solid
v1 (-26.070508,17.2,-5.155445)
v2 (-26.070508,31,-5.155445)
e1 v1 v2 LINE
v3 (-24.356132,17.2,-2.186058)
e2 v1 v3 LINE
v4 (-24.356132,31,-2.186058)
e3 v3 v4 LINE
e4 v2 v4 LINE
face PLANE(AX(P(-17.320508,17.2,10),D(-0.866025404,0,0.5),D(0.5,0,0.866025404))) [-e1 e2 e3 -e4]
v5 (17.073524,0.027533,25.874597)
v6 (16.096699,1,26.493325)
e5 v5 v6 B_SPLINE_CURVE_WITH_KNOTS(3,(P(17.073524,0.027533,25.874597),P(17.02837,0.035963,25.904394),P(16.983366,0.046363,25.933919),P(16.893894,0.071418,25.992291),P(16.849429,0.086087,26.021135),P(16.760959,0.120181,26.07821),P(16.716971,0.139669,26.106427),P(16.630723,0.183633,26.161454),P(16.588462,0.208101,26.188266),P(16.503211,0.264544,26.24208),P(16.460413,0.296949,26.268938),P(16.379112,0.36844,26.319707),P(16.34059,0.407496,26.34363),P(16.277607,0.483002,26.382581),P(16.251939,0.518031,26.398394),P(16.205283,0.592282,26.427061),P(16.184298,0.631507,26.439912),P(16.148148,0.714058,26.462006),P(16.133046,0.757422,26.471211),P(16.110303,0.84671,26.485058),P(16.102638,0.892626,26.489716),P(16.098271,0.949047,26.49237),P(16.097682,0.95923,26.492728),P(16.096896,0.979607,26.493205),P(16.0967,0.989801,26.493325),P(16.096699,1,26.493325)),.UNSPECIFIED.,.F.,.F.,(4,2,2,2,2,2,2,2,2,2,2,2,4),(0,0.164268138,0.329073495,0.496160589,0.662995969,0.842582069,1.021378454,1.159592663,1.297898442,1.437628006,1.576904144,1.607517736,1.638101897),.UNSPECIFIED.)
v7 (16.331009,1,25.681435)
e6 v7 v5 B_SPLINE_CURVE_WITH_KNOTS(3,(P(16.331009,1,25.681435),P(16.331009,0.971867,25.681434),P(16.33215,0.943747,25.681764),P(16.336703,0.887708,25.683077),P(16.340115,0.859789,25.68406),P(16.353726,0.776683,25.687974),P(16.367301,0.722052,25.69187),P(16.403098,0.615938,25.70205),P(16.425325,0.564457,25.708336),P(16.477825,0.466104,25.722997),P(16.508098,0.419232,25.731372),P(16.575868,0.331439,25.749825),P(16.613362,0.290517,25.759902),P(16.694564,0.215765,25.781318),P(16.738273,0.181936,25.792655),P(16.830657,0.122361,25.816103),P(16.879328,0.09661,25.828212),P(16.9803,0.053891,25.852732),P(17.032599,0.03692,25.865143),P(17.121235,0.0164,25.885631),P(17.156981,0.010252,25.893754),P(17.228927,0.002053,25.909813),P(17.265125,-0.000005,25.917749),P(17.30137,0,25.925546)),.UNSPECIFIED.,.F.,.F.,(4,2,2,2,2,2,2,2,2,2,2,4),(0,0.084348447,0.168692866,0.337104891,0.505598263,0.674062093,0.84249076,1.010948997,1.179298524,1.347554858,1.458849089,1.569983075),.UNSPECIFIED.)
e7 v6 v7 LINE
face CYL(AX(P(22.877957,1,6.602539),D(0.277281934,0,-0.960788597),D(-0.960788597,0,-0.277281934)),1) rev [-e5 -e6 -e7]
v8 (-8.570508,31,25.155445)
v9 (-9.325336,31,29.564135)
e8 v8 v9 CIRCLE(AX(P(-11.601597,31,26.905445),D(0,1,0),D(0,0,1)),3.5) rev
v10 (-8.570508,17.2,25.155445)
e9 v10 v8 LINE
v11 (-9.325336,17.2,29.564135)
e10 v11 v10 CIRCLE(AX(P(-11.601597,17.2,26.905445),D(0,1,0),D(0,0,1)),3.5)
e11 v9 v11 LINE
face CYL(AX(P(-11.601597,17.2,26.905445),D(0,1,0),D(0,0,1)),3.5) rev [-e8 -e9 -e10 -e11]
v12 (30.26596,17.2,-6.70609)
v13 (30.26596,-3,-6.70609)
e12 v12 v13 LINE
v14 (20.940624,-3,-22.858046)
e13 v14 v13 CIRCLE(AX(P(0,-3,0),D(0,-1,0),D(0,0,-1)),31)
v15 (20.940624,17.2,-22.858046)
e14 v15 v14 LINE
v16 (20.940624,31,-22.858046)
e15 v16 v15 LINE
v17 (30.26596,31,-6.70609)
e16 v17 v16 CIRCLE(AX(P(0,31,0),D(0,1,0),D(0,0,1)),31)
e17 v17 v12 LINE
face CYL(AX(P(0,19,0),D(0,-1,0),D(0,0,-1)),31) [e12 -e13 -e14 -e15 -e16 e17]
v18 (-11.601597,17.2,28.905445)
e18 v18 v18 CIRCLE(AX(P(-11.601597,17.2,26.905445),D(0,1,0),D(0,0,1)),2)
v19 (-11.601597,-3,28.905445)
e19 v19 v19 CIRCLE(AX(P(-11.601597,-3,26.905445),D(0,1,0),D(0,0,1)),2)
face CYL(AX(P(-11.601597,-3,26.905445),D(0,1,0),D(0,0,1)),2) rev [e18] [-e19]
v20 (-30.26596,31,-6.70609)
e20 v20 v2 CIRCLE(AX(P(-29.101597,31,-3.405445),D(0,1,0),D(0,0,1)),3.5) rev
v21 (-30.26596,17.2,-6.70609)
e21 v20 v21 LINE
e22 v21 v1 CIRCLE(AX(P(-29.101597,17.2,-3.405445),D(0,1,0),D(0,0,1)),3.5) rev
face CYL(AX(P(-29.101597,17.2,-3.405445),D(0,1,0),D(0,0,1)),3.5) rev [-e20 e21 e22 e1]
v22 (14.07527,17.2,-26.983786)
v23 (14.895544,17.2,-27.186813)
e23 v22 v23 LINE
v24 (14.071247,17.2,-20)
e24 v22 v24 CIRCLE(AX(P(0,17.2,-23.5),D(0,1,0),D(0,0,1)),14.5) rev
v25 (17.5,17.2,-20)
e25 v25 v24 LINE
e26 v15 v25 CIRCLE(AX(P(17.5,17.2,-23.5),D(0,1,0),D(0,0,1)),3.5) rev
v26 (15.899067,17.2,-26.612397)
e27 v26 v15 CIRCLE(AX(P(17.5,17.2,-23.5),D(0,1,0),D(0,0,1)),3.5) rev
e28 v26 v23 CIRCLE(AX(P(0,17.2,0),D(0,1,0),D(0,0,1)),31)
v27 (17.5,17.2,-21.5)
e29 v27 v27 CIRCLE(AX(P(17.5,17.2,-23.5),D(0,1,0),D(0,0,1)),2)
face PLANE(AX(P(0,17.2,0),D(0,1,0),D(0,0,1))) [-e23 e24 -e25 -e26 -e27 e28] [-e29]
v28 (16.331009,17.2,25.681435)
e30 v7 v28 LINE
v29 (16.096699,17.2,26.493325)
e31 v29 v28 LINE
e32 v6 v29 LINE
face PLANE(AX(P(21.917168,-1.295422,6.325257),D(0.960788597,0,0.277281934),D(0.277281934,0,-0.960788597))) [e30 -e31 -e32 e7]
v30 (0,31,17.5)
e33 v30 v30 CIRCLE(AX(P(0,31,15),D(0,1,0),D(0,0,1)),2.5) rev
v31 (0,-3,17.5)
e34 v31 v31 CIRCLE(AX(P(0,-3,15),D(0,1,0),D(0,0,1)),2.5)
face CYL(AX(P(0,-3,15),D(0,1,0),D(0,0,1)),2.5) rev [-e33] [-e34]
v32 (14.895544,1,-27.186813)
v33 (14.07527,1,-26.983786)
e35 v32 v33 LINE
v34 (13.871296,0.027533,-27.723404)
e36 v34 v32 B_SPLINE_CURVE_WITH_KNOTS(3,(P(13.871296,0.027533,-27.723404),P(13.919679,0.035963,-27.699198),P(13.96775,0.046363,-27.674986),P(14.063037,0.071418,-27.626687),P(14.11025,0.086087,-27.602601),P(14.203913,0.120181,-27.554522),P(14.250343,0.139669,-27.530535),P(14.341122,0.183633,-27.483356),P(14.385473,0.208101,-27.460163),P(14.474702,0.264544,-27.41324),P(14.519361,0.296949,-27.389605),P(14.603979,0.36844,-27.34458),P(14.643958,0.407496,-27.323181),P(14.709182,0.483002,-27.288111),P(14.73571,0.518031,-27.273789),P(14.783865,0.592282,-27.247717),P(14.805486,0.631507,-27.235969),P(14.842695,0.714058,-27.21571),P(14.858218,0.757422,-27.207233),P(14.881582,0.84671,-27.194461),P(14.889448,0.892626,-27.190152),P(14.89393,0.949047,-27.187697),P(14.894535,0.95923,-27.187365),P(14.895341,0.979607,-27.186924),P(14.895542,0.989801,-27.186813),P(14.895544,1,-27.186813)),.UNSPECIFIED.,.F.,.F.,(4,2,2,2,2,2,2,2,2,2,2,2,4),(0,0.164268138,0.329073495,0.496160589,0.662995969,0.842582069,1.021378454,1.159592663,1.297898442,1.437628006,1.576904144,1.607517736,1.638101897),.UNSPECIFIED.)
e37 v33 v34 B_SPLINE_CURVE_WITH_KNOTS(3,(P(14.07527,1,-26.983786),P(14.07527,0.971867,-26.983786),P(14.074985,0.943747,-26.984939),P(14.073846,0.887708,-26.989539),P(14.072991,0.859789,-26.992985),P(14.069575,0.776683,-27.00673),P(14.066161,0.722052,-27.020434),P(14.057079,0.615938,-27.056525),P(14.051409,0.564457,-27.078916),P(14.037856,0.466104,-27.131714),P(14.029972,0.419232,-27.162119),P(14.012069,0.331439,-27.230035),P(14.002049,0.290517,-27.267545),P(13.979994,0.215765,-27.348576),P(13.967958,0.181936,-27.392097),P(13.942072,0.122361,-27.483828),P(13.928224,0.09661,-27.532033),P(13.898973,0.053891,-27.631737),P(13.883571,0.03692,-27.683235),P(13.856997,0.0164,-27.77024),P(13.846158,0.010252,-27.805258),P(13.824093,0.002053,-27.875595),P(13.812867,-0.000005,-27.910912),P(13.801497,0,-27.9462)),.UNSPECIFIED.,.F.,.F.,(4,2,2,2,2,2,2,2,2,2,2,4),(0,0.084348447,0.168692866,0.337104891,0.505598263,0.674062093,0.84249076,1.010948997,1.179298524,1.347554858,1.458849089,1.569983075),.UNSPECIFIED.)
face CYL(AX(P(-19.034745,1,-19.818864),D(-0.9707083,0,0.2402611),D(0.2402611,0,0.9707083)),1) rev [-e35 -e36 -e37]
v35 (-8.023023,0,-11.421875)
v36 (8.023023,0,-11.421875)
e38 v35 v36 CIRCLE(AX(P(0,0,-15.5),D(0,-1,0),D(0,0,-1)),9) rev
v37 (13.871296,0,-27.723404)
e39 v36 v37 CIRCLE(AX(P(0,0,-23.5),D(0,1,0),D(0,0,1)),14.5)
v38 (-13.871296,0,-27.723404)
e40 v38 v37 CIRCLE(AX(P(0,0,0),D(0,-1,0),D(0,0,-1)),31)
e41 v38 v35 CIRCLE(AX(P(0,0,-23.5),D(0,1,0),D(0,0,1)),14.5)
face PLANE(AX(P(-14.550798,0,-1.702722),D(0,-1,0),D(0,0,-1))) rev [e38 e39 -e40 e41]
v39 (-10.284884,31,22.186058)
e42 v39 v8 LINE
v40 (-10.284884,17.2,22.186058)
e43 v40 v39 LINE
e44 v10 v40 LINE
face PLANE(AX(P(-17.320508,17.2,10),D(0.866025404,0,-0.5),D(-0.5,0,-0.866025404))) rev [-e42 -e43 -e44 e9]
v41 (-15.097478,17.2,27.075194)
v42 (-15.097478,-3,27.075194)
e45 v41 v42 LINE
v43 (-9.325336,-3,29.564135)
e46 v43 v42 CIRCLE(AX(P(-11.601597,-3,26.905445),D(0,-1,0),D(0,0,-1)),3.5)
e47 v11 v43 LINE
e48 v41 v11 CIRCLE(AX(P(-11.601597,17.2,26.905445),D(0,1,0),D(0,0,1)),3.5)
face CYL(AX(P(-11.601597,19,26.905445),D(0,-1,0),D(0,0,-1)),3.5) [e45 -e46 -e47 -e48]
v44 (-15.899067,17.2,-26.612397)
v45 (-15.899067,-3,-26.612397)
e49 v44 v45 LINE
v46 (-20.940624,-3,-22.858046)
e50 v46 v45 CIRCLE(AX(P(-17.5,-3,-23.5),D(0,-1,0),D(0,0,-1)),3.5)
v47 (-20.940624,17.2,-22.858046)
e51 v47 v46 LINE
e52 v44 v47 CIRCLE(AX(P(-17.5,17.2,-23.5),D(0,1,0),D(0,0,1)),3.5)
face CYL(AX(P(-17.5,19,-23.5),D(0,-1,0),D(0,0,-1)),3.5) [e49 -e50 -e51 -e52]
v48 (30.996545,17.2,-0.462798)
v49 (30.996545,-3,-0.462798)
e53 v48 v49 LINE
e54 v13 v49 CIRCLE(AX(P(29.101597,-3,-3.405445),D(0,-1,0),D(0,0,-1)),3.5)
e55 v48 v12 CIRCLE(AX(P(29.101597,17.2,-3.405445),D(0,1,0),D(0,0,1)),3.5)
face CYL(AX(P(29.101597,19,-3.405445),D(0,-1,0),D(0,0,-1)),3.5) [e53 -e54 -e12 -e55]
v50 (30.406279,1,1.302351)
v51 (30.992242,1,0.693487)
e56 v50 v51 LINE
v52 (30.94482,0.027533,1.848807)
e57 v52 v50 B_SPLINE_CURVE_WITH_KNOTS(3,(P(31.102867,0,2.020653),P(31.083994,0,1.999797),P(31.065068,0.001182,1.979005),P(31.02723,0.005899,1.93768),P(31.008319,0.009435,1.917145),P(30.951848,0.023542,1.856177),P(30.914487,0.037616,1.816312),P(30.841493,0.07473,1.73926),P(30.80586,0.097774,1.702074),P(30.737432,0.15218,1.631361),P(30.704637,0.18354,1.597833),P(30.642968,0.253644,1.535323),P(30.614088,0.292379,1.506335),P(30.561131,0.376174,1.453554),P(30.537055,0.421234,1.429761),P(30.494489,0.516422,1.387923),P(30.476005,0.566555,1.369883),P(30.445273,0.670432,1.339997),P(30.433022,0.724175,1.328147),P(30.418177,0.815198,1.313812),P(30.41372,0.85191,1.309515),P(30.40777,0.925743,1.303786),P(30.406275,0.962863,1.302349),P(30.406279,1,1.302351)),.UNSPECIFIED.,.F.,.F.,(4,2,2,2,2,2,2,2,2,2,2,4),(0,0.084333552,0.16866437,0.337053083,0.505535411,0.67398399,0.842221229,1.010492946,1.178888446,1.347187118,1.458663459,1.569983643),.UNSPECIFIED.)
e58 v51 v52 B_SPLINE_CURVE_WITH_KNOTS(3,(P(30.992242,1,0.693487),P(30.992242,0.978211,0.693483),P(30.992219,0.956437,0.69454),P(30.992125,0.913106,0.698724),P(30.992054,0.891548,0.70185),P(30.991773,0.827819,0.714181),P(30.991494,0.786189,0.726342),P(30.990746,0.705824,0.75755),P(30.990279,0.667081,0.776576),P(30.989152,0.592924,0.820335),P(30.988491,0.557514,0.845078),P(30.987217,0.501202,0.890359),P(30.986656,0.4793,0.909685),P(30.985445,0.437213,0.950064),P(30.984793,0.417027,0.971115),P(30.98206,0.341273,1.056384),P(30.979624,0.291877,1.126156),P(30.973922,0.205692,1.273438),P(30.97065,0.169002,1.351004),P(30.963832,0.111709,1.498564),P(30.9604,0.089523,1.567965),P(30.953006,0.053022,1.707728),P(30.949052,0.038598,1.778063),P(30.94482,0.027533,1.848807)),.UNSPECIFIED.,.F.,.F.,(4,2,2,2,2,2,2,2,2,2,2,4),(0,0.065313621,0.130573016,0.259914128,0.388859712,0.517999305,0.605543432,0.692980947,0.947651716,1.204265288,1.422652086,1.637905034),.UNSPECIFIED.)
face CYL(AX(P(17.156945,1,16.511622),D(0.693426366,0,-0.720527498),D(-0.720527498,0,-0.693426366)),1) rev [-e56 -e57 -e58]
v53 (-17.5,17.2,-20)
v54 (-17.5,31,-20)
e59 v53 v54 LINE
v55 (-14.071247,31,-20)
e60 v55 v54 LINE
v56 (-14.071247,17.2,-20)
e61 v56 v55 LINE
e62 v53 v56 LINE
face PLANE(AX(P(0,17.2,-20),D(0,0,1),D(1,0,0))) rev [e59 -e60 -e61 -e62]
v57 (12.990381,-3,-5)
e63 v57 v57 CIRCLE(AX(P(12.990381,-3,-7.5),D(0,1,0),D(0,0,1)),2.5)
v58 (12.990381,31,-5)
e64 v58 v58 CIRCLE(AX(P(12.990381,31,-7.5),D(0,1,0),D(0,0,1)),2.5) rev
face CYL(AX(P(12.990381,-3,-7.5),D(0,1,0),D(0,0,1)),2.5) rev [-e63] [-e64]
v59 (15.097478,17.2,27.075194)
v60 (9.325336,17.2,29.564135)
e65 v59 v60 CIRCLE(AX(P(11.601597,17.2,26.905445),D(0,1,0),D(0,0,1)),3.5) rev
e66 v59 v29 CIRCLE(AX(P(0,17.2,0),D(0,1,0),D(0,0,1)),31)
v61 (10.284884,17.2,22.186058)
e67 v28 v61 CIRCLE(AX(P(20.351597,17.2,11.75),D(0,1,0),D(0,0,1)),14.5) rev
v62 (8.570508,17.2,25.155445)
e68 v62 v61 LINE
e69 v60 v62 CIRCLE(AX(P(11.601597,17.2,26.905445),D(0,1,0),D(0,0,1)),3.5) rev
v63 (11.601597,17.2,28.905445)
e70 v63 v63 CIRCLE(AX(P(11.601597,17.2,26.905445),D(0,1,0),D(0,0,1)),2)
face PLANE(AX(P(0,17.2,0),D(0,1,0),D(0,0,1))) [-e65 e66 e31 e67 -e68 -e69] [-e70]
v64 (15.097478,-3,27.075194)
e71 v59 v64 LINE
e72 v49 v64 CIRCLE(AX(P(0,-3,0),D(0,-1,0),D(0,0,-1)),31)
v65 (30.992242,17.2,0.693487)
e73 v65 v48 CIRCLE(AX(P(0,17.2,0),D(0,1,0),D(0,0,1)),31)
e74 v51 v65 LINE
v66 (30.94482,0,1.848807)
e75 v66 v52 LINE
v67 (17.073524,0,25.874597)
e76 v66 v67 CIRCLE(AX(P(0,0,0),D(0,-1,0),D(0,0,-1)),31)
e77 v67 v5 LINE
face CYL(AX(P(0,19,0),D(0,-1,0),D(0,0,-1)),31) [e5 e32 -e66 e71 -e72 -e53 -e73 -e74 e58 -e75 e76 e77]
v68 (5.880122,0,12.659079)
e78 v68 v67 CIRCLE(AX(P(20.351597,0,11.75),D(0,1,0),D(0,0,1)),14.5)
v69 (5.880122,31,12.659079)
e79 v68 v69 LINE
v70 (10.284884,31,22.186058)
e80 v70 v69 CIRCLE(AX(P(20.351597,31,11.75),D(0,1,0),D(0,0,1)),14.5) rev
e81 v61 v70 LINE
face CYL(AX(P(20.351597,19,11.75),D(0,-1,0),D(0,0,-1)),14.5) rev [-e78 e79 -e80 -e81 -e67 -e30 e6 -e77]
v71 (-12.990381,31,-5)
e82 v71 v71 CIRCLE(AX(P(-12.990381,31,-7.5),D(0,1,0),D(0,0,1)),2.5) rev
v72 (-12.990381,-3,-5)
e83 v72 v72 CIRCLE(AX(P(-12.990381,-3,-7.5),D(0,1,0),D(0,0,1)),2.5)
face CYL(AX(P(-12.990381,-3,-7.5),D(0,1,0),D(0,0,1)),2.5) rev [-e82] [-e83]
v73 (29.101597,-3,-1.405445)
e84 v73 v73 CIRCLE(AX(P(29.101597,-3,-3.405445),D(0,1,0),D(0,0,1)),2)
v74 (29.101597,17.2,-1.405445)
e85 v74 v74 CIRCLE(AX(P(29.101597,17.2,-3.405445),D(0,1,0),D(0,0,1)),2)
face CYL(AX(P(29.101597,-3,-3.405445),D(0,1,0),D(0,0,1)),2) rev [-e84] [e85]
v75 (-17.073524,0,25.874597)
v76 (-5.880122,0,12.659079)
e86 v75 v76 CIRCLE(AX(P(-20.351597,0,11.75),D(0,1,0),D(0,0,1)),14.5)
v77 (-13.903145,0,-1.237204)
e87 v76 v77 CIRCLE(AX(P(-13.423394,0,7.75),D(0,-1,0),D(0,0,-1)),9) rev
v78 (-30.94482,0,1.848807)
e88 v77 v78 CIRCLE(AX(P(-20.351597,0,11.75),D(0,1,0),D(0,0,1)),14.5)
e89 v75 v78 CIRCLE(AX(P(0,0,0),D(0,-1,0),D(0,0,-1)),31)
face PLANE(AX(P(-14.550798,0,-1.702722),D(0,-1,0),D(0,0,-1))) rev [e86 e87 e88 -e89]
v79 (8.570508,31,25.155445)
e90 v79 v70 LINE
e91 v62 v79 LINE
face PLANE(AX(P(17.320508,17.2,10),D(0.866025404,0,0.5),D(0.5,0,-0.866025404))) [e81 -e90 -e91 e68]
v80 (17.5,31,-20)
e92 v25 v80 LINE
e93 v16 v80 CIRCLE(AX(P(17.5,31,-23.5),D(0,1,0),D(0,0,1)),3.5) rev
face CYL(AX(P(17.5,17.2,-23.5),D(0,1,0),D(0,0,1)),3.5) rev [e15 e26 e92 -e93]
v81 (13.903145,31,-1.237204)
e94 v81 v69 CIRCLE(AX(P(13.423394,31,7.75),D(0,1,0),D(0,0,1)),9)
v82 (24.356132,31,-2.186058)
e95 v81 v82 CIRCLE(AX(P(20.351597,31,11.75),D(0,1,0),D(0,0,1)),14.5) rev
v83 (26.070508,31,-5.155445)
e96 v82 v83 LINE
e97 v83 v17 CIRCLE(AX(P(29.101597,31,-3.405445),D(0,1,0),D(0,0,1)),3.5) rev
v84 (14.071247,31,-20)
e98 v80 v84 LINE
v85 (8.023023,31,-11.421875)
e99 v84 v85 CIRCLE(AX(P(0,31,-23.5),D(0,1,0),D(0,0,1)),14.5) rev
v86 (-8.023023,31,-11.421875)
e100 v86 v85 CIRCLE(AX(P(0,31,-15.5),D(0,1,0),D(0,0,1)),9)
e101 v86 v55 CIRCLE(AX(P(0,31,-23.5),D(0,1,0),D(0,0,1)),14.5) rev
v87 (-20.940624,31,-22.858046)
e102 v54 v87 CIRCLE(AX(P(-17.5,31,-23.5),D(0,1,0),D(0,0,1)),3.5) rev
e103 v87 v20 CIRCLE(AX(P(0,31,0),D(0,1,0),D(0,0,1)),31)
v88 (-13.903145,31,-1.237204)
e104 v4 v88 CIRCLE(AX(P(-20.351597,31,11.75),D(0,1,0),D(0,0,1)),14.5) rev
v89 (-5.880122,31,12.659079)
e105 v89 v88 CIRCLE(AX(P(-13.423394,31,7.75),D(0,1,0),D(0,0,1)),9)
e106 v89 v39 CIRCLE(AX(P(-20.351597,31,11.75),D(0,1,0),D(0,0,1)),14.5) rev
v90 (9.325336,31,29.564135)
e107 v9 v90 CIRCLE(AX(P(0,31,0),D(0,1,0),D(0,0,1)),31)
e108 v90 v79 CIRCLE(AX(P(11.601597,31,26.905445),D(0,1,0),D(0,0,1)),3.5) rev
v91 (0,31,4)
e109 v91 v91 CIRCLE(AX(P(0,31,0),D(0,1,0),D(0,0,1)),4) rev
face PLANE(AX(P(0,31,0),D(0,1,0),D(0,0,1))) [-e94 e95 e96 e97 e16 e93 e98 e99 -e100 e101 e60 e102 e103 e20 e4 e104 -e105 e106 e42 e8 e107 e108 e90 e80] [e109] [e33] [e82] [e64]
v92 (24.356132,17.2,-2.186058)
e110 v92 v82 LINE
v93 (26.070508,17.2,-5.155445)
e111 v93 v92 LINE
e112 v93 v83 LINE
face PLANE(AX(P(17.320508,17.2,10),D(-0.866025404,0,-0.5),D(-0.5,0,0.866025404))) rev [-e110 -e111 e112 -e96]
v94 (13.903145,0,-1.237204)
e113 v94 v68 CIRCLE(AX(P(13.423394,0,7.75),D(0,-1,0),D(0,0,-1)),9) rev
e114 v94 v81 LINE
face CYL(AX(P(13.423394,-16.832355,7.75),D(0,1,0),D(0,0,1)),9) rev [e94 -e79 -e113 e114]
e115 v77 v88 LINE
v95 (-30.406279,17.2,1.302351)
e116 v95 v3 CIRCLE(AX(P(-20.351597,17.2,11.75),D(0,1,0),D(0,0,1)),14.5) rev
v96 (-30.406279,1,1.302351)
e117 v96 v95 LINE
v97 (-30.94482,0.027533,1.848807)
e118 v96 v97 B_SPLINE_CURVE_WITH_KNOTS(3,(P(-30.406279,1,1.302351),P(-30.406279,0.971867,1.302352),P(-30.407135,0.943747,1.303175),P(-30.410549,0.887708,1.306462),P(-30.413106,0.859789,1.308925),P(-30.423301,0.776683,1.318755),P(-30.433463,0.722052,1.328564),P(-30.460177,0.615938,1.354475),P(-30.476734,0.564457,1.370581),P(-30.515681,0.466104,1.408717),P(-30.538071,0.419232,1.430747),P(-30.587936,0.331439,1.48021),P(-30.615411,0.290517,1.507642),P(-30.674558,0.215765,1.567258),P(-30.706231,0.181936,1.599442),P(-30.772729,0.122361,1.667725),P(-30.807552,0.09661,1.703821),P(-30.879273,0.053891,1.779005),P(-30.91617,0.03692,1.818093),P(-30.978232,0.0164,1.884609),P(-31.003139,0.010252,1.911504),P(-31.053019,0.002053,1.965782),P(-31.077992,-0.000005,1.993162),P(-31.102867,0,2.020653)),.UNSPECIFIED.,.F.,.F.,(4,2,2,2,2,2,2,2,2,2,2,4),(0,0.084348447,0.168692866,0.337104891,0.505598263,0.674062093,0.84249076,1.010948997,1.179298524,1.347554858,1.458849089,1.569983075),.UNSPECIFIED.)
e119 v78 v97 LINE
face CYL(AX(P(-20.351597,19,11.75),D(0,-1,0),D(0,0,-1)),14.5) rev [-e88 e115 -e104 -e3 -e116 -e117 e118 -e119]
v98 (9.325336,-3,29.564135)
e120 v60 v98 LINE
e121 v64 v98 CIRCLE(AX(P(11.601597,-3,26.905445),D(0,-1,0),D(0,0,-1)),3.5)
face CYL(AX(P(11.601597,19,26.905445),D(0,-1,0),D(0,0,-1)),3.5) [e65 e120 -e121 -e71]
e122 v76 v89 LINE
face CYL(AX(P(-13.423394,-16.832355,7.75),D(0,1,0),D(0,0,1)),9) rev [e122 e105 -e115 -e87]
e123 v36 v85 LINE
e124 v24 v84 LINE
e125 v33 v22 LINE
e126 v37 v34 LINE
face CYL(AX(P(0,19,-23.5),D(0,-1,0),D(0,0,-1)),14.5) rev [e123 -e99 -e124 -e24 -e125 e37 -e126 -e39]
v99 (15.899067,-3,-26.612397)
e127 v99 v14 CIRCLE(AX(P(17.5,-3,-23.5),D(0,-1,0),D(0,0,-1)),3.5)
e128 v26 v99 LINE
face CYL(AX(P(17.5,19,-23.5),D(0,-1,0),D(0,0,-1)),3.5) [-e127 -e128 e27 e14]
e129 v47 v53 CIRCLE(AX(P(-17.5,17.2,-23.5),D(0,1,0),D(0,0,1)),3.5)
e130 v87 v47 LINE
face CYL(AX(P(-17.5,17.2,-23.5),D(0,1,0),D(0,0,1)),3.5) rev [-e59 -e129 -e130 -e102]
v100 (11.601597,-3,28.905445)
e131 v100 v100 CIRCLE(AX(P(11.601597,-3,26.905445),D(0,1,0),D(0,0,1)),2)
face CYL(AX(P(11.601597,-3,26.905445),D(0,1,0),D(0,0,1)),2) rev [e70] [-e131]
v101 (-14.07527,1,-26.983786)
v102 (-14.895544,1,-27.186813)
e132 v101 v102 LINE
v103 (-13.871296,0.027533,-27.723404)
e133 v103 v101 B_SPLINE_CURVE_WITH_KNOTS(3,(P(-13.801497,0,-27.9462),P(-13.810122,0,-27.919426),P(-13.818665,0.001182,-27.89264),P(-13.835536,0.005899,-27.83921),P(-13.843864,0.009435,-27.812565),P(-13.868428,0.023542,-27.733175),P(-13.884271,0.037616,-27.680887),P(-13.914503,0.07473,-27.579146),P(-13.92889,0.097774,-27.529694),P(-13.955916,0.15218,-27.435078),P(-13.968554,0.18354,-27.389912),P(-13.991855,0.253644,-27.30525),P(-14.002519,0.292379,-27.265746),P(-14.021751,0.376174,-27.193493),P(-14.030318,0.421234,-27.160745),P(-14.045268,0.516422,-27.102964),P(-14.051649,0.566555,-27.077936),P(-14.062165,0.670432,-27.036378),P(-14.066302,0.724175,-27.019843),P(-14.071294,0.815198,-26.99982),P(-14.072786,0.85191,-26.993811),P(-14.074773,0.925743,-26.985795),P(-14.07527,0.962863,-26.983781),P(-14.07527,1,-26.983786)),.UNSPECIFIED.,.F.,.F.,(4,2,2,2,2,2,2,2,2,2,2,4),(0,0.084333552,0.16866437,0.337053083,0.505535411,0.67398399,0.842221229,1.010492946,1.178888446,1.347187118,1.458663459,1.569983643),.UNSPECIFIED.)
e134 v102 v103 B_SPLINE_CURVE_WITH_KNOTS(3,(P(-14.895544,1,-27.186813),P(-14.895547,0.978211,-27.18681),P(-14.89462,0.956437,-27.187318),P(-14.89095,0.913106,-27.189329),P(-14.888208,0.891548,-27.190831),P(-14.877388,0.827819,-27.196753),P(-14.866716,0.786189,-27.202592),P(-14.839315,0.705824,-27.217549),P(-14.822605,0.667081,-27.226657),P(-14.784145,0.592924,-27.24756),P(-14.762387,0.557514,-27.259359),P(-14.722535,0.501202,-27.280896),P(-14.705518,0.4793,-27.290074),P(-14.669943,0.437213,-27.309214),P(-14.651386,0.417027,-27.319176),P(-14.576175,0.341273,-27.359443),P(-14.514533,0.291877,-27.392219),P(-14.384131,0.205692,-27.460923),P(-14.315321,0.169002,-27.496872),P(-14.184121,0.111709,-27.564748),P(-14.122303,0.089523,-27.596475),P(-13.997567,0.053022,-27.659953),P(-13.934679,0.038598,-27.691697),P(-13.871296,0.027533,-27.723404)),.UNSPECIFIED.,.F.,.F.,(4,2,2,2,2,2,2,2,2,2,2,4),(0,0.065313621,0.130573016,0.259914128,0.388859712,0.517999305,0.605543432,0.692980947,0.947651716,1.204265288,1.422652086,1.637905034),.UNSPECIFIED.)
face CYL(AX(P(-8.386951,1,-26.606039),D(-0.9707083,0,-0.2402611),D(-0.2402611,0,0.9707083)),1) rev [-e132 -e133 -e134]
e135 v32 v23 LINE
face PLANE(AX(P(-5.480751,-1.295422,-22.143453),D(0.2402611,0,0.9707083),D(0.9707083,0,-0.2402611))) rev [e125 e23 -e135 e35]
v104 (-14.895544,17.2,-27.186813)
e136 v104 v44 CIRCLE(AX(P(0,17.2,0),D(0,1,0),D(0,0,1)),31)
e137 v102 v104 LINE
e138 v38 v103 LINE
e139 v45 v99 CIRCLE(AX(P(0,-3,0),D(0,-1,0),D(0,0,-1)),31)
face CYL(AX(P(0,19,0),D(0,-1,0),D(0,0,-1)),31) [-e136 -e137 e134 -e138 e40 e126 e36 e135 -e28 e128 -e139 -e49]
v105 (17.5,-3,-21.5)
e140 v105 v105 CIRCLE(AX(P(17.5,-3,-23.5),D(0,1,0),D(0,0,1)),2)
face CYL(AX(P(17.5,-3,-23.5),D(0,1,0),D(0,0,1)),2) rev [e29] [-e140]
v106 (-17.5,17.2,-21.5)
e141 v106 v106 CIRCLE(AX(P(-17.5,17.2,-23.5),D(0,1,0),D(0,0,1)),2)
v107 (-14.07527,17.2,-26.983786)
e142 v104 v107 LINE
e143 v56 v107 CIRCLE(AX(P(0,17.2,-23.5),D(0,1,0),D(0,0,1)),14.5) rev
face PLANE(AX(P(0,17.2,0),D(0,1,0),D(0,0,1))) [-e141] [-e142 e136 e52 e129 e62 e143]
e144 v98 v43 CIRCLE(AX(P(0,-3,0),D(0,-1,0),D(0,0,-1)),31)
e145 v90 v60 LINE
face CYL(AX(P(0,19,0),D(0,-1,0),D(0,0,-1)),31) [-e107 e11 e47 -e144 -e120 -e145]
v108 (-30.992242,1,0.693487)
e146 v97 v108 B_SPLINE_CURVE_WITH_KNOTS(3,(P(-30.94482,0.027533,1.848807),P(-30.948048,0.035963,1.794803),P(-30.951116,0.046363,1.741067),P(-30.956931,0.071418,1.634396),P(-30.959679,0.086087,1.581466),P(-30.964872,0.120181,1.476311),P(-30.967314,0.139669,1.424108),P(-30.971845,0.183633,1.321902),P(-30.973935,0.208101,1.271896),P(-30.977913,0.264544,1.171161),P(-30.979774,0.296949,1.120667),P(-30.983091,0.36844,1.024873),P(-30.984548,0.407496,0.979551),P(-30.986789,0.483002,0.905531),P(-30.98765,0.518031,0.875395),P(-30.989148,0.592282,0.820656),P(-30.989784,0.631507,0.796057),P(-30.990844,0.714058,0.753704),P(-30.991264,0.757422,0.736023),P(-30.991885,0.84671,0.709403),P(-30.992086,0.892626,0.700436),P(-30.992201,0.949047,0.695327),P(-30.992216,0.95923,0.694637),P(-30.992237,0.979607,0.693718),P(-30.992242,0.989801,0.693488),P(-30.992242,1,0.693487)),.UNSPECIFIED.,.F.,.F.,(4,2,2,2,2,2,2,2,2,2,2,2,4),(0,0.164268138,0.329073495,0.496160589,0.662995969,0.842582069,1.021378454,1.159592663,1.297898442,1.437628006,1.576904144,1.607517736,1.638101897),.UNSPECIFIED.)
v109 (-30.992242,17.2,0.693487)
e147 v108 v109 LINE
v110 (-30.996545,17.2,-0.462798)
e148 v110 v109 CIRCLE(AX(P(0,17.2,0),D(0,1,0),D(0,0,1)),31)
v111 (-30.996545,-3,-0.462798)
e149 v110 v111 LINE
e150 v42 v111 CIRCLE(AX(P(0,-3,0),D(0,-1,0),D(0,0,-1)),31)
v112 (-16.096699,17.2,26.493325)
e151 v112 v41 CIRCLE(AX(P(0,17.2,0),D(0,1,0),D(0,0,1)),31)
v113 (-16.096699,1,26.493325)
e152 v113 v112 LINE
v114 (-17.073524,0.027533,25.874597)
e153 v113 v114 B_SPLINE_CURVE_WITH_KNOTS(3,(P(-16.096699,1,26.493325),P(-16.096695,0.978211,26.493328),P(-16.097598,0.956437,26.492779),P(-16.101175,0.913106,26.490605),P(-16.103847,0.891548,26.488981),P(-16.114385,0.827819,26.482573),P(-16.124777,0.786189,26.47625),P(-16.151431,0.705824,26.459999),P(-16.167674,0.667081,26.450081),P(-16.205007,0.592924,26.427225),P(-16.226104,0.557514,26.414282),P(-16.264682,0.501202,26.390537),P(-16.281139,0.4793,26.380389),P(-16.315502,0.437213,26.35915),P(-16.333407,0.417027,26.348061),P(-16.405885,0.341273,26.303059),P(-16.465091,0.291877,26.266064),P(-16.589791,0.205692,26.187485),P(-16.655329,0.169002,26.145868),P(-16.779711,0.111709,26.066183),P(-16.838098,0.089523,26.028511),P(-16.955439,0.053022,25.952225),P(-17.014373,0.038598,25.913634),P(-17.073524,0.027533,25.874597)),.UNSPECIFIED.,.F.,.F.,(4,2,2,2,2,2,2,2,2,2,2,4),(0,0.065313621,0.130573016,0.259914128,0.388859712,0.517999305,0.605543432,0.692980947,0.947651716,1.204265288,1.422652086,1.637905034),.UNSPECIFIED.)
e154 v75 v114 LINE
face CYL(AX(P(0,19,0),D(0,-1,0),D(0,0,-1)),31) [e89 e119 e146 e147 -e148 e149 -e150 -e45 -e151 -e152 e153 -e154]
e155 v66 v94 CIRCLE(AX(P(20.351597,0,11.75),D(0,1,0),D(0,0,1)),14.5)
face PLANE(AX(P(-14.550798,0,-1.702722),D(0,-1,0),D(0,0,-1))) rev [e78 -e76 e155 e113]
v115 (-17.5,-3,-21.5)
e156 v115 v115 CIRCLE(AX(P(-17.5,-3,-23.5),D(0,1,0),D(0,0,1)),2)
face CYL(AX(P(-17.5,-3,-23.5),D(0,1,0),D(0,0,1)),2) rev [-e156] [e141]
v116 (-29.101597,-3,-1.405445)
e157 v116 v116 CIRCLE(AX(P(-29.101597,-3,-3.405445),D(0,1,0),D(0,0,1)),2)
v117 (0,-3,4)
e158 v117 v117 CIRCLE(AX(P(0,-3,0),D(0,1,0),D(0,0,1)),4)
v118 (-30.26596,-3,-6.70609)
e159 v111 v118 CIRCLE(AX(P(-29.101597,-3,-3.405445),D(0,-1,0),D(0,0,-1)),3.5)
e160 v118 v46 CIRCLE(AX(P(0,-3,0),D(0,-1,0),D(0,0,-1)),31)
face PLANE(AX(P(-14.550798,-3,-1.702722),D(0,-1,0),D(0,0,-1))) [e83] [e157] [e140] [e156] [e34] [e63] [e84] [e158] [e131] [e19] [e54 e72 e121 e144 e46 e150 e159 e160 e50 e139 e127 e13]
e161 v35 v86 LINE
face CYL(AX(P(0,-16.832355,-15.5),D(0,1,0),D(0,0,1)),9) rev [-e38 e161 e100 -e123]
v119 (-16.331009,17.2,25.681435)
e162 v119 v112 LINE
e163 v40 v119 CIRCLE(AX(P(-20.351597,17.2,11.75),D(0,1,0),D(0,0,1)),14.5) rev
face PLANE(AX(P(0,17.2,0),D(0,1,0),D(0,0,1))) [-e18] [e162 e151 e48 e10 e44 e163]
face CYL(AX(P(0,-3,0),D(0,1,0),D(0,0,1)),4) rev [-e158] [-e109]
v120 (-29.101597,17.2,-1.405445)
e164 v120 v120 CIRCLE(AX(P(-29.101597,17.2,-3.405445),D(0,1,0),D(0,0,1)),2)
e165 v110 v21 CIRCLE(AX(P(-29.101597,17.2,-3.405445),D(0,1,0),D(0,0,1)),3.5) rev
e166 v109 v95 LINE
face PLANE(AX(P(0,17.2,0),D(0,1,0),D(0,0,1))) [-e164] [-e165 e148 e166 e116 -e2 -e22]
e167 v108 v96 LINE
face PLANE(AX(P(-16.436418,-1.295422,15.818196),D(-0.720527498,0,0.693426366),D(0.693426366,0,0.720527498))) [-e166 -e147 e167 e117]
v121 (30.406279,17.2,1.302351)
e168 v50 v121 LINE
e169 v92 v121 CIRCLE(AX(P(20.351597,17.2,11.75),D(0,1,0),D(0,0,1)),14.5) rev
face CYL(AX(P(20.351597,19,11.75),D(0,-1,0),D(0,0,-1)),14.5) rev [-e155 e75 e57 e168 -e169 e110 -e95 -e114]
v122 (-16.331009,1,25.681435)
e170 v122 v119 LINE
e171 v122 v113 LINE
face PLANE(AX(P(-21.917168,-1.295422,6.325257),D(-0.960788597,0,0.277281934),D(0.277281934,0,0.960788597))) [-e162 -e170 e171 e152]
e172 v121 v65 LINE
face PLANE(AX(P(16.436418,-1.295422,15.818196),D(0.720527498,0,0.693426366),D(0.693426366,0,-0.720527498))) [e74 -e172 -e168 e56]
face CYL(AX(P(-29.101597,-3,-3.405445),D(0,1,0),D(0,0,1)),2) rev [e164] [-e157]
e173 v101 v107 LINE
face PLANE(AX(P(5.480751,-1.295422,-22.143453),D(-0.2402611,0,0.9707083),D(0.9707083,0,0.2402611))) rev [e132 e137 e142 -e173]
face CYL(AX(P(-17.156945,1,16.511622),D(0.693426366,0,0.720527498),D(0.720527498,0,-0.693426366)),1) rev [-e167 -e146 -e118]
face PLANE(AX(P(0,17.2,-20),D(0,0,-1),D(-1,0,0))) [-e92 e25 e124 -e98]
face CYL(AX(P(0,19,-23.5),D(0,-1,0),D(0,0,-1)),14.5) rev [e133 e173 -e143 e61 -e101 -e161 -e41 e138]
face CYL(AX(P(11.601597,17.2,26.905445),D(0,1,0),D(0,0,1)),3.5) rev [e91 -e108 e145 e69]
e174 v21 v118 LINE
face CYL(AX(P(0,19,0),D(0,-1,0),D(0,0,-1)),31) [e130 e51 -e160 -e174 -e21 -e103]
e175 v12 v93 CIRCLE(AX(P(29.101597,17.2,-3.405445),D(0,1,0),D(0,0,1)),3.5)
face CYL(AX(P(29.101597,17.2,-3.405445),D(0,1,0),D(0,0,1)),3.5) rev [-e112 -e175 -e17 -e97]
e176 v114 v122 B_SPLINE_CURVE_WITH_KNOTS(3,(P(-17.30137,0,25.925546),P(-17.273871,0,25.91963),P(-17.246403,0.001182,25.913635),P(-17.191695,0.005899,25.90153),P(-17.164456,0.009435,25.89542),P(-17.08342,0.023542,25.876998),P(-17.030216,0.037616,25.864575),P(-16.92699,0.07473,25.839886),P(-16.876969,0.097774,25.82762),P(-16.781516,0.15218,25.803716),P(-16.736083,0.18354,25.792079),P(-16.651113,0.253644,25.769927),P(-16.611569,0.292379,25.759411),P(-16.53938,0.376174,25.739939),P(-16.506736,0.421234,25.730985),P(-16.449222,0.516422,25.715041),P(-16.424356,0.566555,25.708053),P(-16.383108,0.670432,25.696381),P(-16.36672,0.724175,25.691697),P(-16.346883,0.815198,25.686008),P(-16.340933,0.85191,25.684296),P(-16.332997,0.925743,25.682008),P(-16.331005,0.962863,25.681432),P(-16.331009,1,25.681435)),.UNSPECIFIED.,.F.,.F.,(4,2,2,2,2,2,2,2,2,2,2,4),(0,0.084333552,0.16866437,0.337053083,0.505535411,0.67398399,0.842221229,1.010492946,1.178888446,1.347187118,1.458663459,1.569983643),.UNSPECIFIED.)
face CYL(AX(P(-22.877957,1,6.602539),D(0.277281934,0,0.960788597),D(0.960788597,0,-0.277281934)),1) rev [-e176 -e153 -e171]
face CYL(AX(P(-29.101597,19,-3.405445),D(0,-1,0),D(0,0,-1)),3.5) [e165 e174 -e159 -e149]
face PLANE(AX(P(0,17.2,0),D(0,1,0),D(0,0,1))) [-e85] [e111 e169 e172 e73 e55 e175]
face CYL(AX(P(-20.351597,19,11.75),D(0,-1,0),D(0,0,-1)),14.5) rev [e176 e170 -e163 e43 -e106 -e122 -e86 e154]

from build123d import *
from build123d.topology import SkipClean

# Parameters (mm, degrees)
BOSS_EXTRUDE1_DEPTH = 19
CUT_EXTRUDE1_START  = -1.8
SKETCH3_R           = 2
CUT_EXTRUDE1_DEPTH  = 1.8
BOSS_EXTRUDE2_START = 3
BOSS_EXTRUDE2_DEPTH = 3
SKETCH5_R           = 2
SKETCH5_R_2         = 4
SKETCH5_R_3         = 2.5
CUT_EXTRUDE2_DEPTH  = 51.078579515
CUT_EXTRUDE3_START  = -19
CUT_EXTRUDE3_DEPTH  = 19
SKETCH9_R           = 2.5
SKETCH9_R_2         = 4
BOSS_EXTRUDE3_DEPTH = 12
CUT_EXTRUDE4_START  = -31
CUT_EXTRUDE4_DEPTH  = 31
FILLET1_R           = 1


with BuildPart() as part:
    # Sketch1 → Boss-Extrude1 (new body)
    with BuildSketch(Plane(origin=(0, 0, 0), x_dir=(1, 0, 0), z_dir=(0, 1, 0))):
        with BuildLine():
            ThreePointArc((13.871296136, 27.723404255), (0, 9), (-13.871296136, 27.723404255))
            ThreePointArc((-13.871296136, 27.723404255), (-14.895543516, 27.186812674), (-15.899067131, 26.612396817))
            ThreePointArc((-15.899067131, 26.612396817), (-19.590431511, 26.307150886), (-20.940624191, 22.858045815))
            ThreePointArc((-20.940624191, 22.858045815), (-26.846787517, 15.5), (-30.265960452, 6.706089613))
            ThreePointArc((-30.265960452, 6.706089613), (-32.577876724, 3.812235917), (-30.996545265, 0.462797623))
            ThreePointArc((-30.996545265, 0.462797623), (-30.992242181, -0.693487249), (-30.944820433, -1.84880729))
            ThreePointArc((-30.944820433, -1.84880729), (-7.794228634, -4.5), (-17.073524296, -25.874596965))
            ThreePointArc((-17.073524296, -25.874596965), (-16.096698665, -26.493325425), (-15.097478134, -27.075194441))
            ThreePointArc((-15.097478134, -27.075194441), (-12.987445213, -30.119386803), (-9.325336261, -29.564135428))
            ThreePointArc((-9.325336261, -29.564135428), (0, -31), (9.325336261, -29.564135428))
            ThreePointArc((9.325336261, -29.564135428), (12.987445213, -30.119386803), (15.097478134, -27.075194441))
            ThreePointArc((15.097478134, -27.075194441), (16.096698665, -26.493325425), (17.073524296, -25.874596965))
            ThreePointArc((17.073524296, -25.874596965), (7.794228634, -4.5), (30.944820433, -1.84880729))
            ThreePointArc((30.944820433, -1.84880729), (30.992242181, -0.693487249), (30.996545265, 0.462797623))
            ThreePointArc((30.996545265, 0.462797623), (32.577876724, 3.812235917), (30.265960452, 6.706089613))
            ThreePointArc((30.265960452, 6.706089613), (26.846787517, 15.5), (20.940624191, 22.858045815))
            ThreePointArc((20.940624191, 22.858045815), (19.590431511, 26.307150886), (15.899067131, 26.612396817))
            ThreePointArc((15.899067131, 26.612396817), (14.895543516, 27.186812674), (13.871296136, 27.723404255))
        make_face()
    extrude(amount=BOSS_EXTRUDE1_DEPTH)

    # Sketch3 → Cut-Extrude1 (cut)
    # profile 1 of 6: a face of its own
    with BuildSketch(Plane(origin=(0, 19, 0), x_dir=(1, 0, 0), z_dir=(0, 1, 0)).offset(CUT_EXTRUDE1_START)):
        with BuildLine():
            ThreePointArc((-15.899067131, 26.612396817), (-20.901719334, 24.323593085), (-17.5, 20))
            Line((-17.5, 20), (-14.071247279, 20))
            ThreePointArc((-14.071247279, 20), (-14.495143202, 23.875264632), (-13.871296136, 27.723404255))
            ThreePointArc((-13.871296136, 27.723404255), (-14.895543516, 27.186812674), (-15.899067131, 26.612396817))
        make_face()
        with Locations(Location((-17.5, 23.5, 0), (0, 0, 270))):
            Circle(SKETCH3_R, mode=Mode.SUBTRACT)
    # profile 2 of 6: a face of its own
    with BuildSketch(Plane(origin=(0, 19, 0), x_dir=(1, 0, 0), z_dir=(0, 1, 0)).offset(CUT_EXTRUDE1_START)):
        with BuildLine():
            ThreePointArc((13.871296136, 27.723404255), (14.495143202, 23.875264632), (14.071247279, 20))
            Line((14.071247279, 20), (17.5, 20))
            ThreePointArc((17.5, 20), (20.901719334, 24.323593085), (15.899067131, 26.612396817))
            ThreePointArc((15.899067131, 26.612396817), (14.895543516, 27.186812674), (13.871296136, 27.723404255))
        make_face()
        with Locations(Location((17.5, 23.5, 0), (0, 0, 270))):
            Circle(SKETCH3_R, mode=Mode.SUBTRACT)
    # profile 3 of 6: a face of its own
    with BuildSketch(Plane(origin=(0, 19, 0), x_dir=(1, 0, 0), z_dir=(0, 1, 0)).offset(CUT_EXTRUDE1_START)):
        with BuildLine():
            ThreePointArc((-26.070508076, 5.155444566), (-31.51570919, 5.939623384), (-30.996545265, 0.462797623))
            ThreePointArc((-30.996545265, 0.462797623), (-30.992242181, -0.693487249), (-30.944820433, -1.84880729))
            ThreePointArc((-30.944820433, -1.84880729), (-27.924157295, 0.615529929), (-24.356131715, 2.186057607))
            Line((-24.356131715, 2.186057607), (-26.070508076, 5.155444566))
        make_face()
        with Locations(Location((-29.101596989, 3.405444566, 0), (0, 0, 270))):
            Circle(SKETCH3_R, mode=Mode.SUBTRACT)
    # profile 4 of 6: a face of its own
    with BuildSketch(Plane(origin=(0, 19, 0), x_dir=(1, 0, 0), z_dir=(0, 1, 0)).offset(CUT_EXTRUDE1_START)):
        with BuildLine():
            ThreePointArc((30.996545265, 0.462797623), (31.51570919, 5.939623384), (26.070508076, 5.155444566))
            Line((26.070508076, 5.155444566), (24.356131715, 2.186057607))
            ThreePointArc((24.356131715, 2.186057607), (27.924157295, 0.615529929), (30.944820433, -1.84880729))
            ThreePointArc((30.944820433, -1.84880729), (30.992242181, -0.693487249), (30.996545265, 0.462797623))
        make_face()
        with Locations(Location((29.101596989, 3.405444566, 0), (0, 0, 270))):
            Circle(SKETCH3_R, mode=Mode.SUBTRACT)
    # profile 5 of 6: a face of its own
    with BuildSketch(Plane(origin=(0, 19, 0), x_dir=(1, 0, 0), z_dir=(0, 1, 0)).offset(CUT_EXTRUDE1_START)):
        with BuildLine():
            Line((-8.570508076, -25.155444566), (-10.284884436, -22.186057607))
            ThreePointArc((-10.284884436, -22.186057607), (-13.429014092, -24.490794561), (-17.073524296, -25.874596965))
            ThreePointArc((-17.073524296, -25.874596965), (-16.096698665, -26.493325425), (-15.097478134, -27.075194441))
            ThreePointArc((-15.097478134, -27.075194441), (-10.613989856, -30.263216469), (-8.570508076, -25.155444566))
        make_face()
        with Locations(Location((-11.601596989, -26.905444566, 0), (0, 0, 270))):
            Circle(SKETCH3_R, mode=Mode.SUBTRACT)
    # profile 6 of 6: a face of its own
    with BuildSketch(Plane(origin=(0, 19, 0), x_dir=(1, 0, 0), z_dir=(0, 1, 0)).offset(CUT_EXTRUDE1_START)):
        with BuildLine():
            ThreePointArc((17.073524296, -25.874596965), (13.429014092, -24.490794561), (10.284884436, -22.186057607))
            Line((10.284884436, -22.186057607), (8.570508076, -25.155444566))
            ThreePointArc((8.570508076, -25.155444566), (10.613989856, -30.263216469), (15.097478134, -27.075194441))
            ThreePointArc((15.097478134, -27.075194441), (16.096698665, -26.493325425), (17.073524296, -25.874596965))
        make_face()
        with Locations(Location((11.601596989, -26.905444566, 0), (0, 0, 270))):
            Circle(SKETCH3_R, mode=Mode.SUBTRACT)
    extrude(amount=CUT_EXTRUDE1_DEPTH, mode=Mode.SUBTRACT)

    # Sketch8 → Boss-Extrude2 (add)
    with SkipClean():  # the faces are left unmerged after this step: merging them gives an invalid solid
        with BuildSketch(Plane.XZ.offset(BOSS_EXTRUDE2_START)):
            with BuildLine():
                ThreePointArc((-15.097478134, 27.075194441), (-26.846787517, 15.5), (-30.996545265, -0.462797623))
                ThreePointArc((-30.996545265, -0.462797623), (-32.577876724, -3.812235917), (-30.265960452, -6.706089613))
                ThreePointArc((-30.265960452, -6.706089613), (-26.846787517, -15.5), (-20.940624191, -22.858045815))
                ThreePointArc((-20.940624191, -22.858045815), (-19.590431511, -26.307150886), (-15.899067131, -26.612396817))
                ThreePointArc((-15.899067131, -26.612396817), (0, -31), (15.899067131, -26.612396817))
                ThreePointArc((15.899067131, -26.612396817), (19.590431511, -26.307150886), (20.940624191, -22.858045815))
                ThreePointArc((20.940624191, -22.858045815), (26.846787517, -15.5), (30.265960452, -6.706089613))
                ThreePointArc((30.265960452, -6.706089613), (32.577876724, -3.812235917), (30.996545265, -0.462797623))
                ThreePointArc((30.996545265, -0.462797623), (26.846787517, 15.5), (15.097478134, 27.075194441))
                ThreePointArc((15.097478134, 27.075194441), (12.987445213, 30.119386803), (9.325336261, 29.564135428))
                ThreePointArc((9.325336261, 29.564135428), (0, 31), (-9.325336261, 29.564135428))
                ThreePointArc((-9.325336261, 29.564135428), (-12.987445213, 30.119386803), (-15.097478134, 27.075194441))
            make_face()
        extrude(amount=-BOSS_EXTRUDE2_DEPTH)

    # Sketch5 → Cut-Extrude2 (cut, through all)
    with SkipClean():  # the faces are left unmerged after this step: merging them gives an invalid solid
        with BuildSketch(Plane(origin=(0, 19, 0), x_dir=(1, 0, 0), z_dir=(0, 1, 0))):
            with Locations(Location((17.5, 23.5, 0), (0, 0, 270))):
                Circle(SKETCH5_R)
            with Locations(Location((-17.5, 23.5, 0), (0, 0, 270))):
                Circle(SKETCH5_R)
            with Locations(Location((0, 0, 0), (0, 0, 270))):
                Circle(SKETCH5_R_2)
            with Locations(Location((-12.990381057, 7.5, 0), (0, 0, 270))):
                Circle(SKETCH5_R_3)
            with Locations(Location((12.990381057, 7.5, 0), (0, 0, 270))):
                Circle(SKETCH5_R_3)
            with Locations(Location((0, -15, 0), (0, 0, 270))):
                Circle(SKETCH5_R_3)
            with Locations(Location((-29.101596989, 3.405444566, 0), (0, 0, 270))):
                Circle(SKETCH5_R)
            with Locations(Location((11.601596989, -26.905444566, 0), (0, 0, 270))):
                Circle(SKETCH5_R)
            with Locations(Location((29.101596989, 3.405444566, 0), (0, 0, 270))):
                Circle(SKETCH5_R)
            with Locations(Location((-11.601596989, -26.905444566, 0), (0, 0, 270))):
                Circle(SKETCH5_R)
        extrude(amount=-CUT_EXTRUDE2_DEPTH, mode=Mode.SUBTRACT)

    # Sketch7 → Cut-Extrude3 (cut)
    with BuildSketch(Plane(origin=(0, 19, 0), x_dir=(1, 0, 0), z_dir=(0, 1, 0)).offset(CUT_EXTRUDE3_START)):
        with BuildLine():
            Line((-30.992242181, -0.693487249), (-30.406279294, -1.302351281))
            ThreePointArc((-30.406279294, -1.302351281), (-30.679164781, -1.572016727), (-30.944820433, -1.84880729))
            ThreePointArc((-30.944820433, -1.84880729), (-30.973918422, -1.271368391), (-30.992242181, -0.693487249))
        make_face()
        with BuildLine():
            ThreePointArc((-17.073524296, -25.874596965), (-16.700988811, -25.782927703), (-16.331008941, -25.681434662))
            Line((-16.331008941, -25.681434662), (-16.096698665, -26.493325425))
            ThreePointArc((-16.096698665, -26.493325425), (-16.587996535, -26.188516013), (-17.073524296, -25.874596965))
        make_face()
        with BuildLine():
            Line((16.096698665, -26.493325425), (16.331008941, -25.681434662))
            ThreePointArc((16.331008941, -25.681434662), (16.700988811, -25.782927703), (17.073524296, -25.874596965))
            ThreePointArc((17.073524296, -25.874596965), (16.587996535, -26.188516013), (16.096698665, -26.493325425))
        make_face()
        with BuildLine():
            ThreePointArc((30.944820433, -1.84880729), (30.679164781, -1.572016727), (30.406279294, -1.302351281))
            Line((30.406279294, -1.302351281), (30.992242181, -0.693487249))
            ThreePointArc((30.992242181, -0.693487249), (30.973918422, -1.271368391), (30.944820433, -1.84880729))
        make_face()
        with BuildLine():
            ThreePointArc((14.075270353, 26.983785943), (13.97817597, 27.35494443), (13.871296136, 27.723404255))
            ThreePointArc((13.871296136, 27.723404255), (14.385921887, 27.459884404), (14.895543516, 27.186812674))
            Line((14.895543516, 27.186812674), (14.075270353, 26.983785943))
        make_face()
        with BuildLine():
            ThreePointArc((-13.871296136, 27.723404255), (-13.97817597, 27.35494443), (-14.075270353, 26.983785943))
            Line((-14.075270353, 26.983785943), (-14.895543516, 27.186812674))
            ThreePointArc((-14.895543516, 27.186812674), (-14.385921887, 27.459884404), (-13.871296136, 27.723404255))
        make_face()
    extrude(amount=CUT_EXTRUDE3_DEPTH, mode=Mode.SUBTRACT)

    # Sketch9 → Boss-Extrude3 (add)
    with BuildSketch(Plane(origin=(0, 19, 0), x_dir=(1, 0, 0), z_dir=(0, 1, 0))):
        with BuildLine():
            ThreePointArc((-17.5, 20), (-19.736421288, 20.807711044), (-20.940624191, 22.858045815))
            ThreePointArc((-20.940624191, 22.858045815), (-26.846787517, 15.5), (-30.265960452, 6.706089613))
            ThreePointArc((-30.265960452, 6.706089613), (-27.888217002, 6.688386693), (-26.070508076, 5.155444566))
            Line((-26.070508076, 5.155444566), (-24.356131715, 2.186057607))
            ThreePointArc((-24.356131715, 2.186057607), (-7.794228634, -4.5), (-10.284884436, -22.186057607))
            Line((-10.284884436, -22.186057607), (-8.570508076, -25.155444566))
            ThreePointArc((-8.570508076, -25.155444566), (-8.151795715, -27.496097737), (-9.325336261, -29.564135428))
            ThreePointArc((-9.325336261, -29.564135428), (0, -31), (9.325336261, -29.564135428))
            ThreePointArc((9.325336261, -29.564135428), (8.151795715, -27.496097737), (8.570508076, -25.155444566))
            Line((8.570508076, -25.155444566), (10.284884436, -22.186057607))
            ThreePointArc((10.284884436, -22.186057607), (7.794228634, -4.5), (24.356131715, 2.186057607))
            Line((24.356131715, 2.186057607), (26.070508076, 5.155444566))
            ThreePointArc((26.070508076, 5.155444566), (27.888217002, 6.688386693), (30.265960452, 6.706089613))
            ThreePointArc((30.265960452, 6.706089613), (26.846787517, 15.5), (20.940624191, 22.858045815))
            ThreePointArc((20.940624191, 22.858045815), (19.736421288, 20.807711044), (17.5, 20))
            Line((17.5, 20), (14.071247279, 20))
            ThreePointArc((14.071247279, 20), (0, 9), (-14.071247279, 20))
            Line((-14.071247279, 20), (-17.5, 20))
        make_face()
        with Locations(Location((0, -15, 0), (0, 0, 270))):
            Circle(SKETCH9_R, mode=Mode.SUBTRACT)
        with Locations(Location((-12.990381057, 7.5, 0), (0, 0, 270))):
            Circle(SKETCH9_R, mode=Mode.SUBTRACT)
        with Locations(Location((12.990381057, 7.5, 0), (0, 0, 270))):
            Circle(SKETCH9_R, mode=Mode.SUBTRACT)
        with Locations(Location((0, 0, 0), (0, 0, 270))):
            Circle(SKETCH9_R_2, mode=Mode.SUBTRACT)
    extrude(amount=BOSS_EXTRUDE3_DEPTH)

    # Sketch14 → Cut-Extrude4 (cut)
    with BuildSketch(Plane(origin=(0, 31, 0), x_dir=(1, 0, 0), z_dir=(0, 1, 0)).offset(CUT_EXTRUDE4_START)):
        with BuildLine():
            ThreePointArc((-8.023022902, 11.421875), (0, 6.5), (8.023022902, 11.421875))
            ThreePointArc((8.023022902, 11.421875), (0, 9), (-8.023022902, 11.421875))
        make_face()
        with BuildLine():
            ThreePointArc((13.90314536, 1.237204148), (7.794228634, -4.5), (5.880122458, -12.659079148))
            ThreePointArc((5.880122458, -12.659079148), (5.629165125, -3.25), (13.90314536, 1.237204148))
        make_face()
        with BuildLine():
            ThreePointArc((-5.880122458, -12.659079148), (-7.794228634, -4.5), (-13.90314536, 1.237204148))
            ThreePointArc((-13.90314536, 1.237204148), (-5.629165125, -3.25), (-5.880122458, -12.659079148))
        make_face()
    extrude(amount=CUT_EXTRUDE4_DEPTH, mode=Mode.SUBTRACT)

    # Fillet1
    # the kernel refuses this fillet: 1 mm, written as the material it adds along each edge
    with BuildSketch(Plane(origin=(-32.725808096, 0, -1.107831496), x_dir=(-0.7205274978491865, 0, 0.6934263658408084), z_dir=(0.6934263658408084, 0, 0.7205274978491865))) as fillet1_piece_1_section:
        with BuildLine():
            CenterArc((FILLET1_R, -FILLET1_R), FILLET1_R, 90, 90)
            Line((0, -FILLET1_R), (0, 0))
            Line((0, 0), (FILLET1_R, 0))
        make_face()
    fillet1_piece_1 = extrude(amount=5.845025394, mode=Mode.PRIVATE)
    fillet1_piece_1 = fillet1_piece_1 & Plane(origin=(0, 0.275496512, 0), x_dir=(-0.48701542367600353, 0, 0.8733933690506717), z_dir=(0, -1, 0)) * Cylinder(31, 16, mode=Mode.PRIVATE)
    fillet1_piece_1 = fillet1_piece_1 - Plane(origin=(-20.351596989, 0.275496512, 11.75), x_dir=(-0.7305671340428671, 0, -0.6828408765271684), z_dir=(0, -1, 0)) * Cylinder(14.5, 16, mode=Mode.PRIVATE)
    add(fillet1_piece_1)
    with BuildSketch(Plane(origin=(-11.648499602, 0, -26.383133195), x_dir=(0.24026109954733937, 0, -0.9707083001830692), z_dir=(-0.9707083001830692, 0, -0.24026109954733937))) as fillet1_piece_2_section:
        with BuildLine():
            CenterArc((FILLET1_R, -FILLET1_R), FILLET1_R, 90, 90)
            Line((0, -FILLET1_R), (0, 0))
            Line((0, 0), (FILLET1_R, 0))
        make_face()
    fillet1_piece_2 = extrude(amount=5.845025394, mode=Mode.PRIVATE)
    fillet1_piece_2 = fillet1_piece_2 & Plane(origin=(0, 0.275496589, 0), x_dir=(-0.5128731332567569, 0, -0.8584644134635966), z_dir=(0, -1, 0)) * Cylinder(31, 16, mode=Mode.PRIVATE)
    fillet1_piece_2 = fillet1_piece_2 - Plane(origin=(0, 0.275496589, -23.5), x_dir=(0.9566411128363953, 0, -0.29126925898752726), z_dir=(0, -1, 0)) * Cylinder(14.5, 16, mode=Mode.PRIVATE)
    add(fillet1_piece_2)
    with BuildSketch(Plane(origin=(17.322314267, 0, -27.787465423), x_dir=(-0.2402610995474686, 0, -0.9707083001830373), z_dir=(-0.9707083001830372, 0, 0.24026109954746858))) as fillet1_piece_3_section:
        with BuildLine():
            CenterArc((FILLET1_R, -FILLET1_R), FILLET1_R, 90, 90)
            Line((0, -FILLET1_R), (0, 0))
            Line((0, 0), (FILLET1_R, 0))
        make_face()
    fillet1_piece_3 = extrude(amount=5.845025394, mode=Mode.PRIVATE)
    fillet1_piece_3 = fillet1_piece_3 & Plane(origin=(0, 0.275496512, 0), x_dir=(-0.5128731332567569, 0, -0.8584644134635966), z_dir=(0, -1, 0)) * Cylinder(31, 16, mode=Mode.PRIVATE)
    fillet1_piece_3 = fillet1_piece_3 - Plane(origin=(0, 0.275496512, -23.5), x_dir=(0.9566411128363953, 0, -0.29126925898752726), z_dir=(0, -1, 0)) * Cylinder(14.5, 16, mode=Mode.PRIVATE)
    add(fillet1_piece_3)
    with BuildSketch(Plane(origin=(28.672713379, 0, 3.103670026), x_dir=(0.7205274978492641, 0, 0.6934263658407279), z_dir=(0.6934263658407279, 0, -0.7205274978492641))) as fillet1_piece_4_section:
        with BuildLine():
            CenterArc((FILLET1_R, -FILLET1_R), FILLET1_R, 90, 90)
            Line((0, -FILLET1_R), (0, 0))
            Line((0, 0), (FILLET1_R, 0))
        make_face()
    fillet1_piece_4 = extrude(amount=5.845025394, mode=Mode.PRIVATE)
    fillet1_piece_4 = fillet1_piece_4 & Plane(origin=(0, 0.275496589, 0), x_dir=(0.9998885569327609, 0, -0.014928955587075495), z_dir=(0, -1, 0)) * Cylinder(31, 16, mode=Mode.PRIVATE)
    fillet1_piece_4 = fillet1_piece_4 - Plane(origin=(20.351596989, 0.275496589, 11.75), x_dir=(-0.22607397879350336, 0, 0.9741101355147038), z_dir=(0, -1, 0)) * Cylinder(14.5, 16, mode=Mode.PRIVATE)
    add(fillet1_piece_4)
    with BuildSketch(Plane(origin=(15.403493829, 0, 28.895296919), x_dir=(0.9607885973966587, 0, 0.2772819343422169), z_dir=(0.27728193434221693, 0, -0.9607885973966587))) as fillet1_piece_5_section:
        with BuildLine():
            CenterArc((FILLET1_R, -FILLET1_R), FILLET1_R, 90, 90)
            Line((0, -FILLET1_R), (0, 0))
            Line((0, 0), (FILLET1_R, 0))
        make_face()
    fillet1_piece_5 = extrude(amount=5.845025394, mode=Mode.PRIVATE)
    fillet1_piece_5 = fillet1_piece_5 & Plane(origin=(0, 0.275496512, 0), x_dir=(0.9998885569327609, 0, -0.014928955587075495), z_dir=(0, -1, 0)) * Cylinder(31, 16, mode=Mode.PRIVATE)
    fillet1_piece_5 = fillet1_piece_5 - Plane(origin=(20.351596989, 0.275496512, 11.75), x_dir=(-0.22607397879350336, 0, 0.9741101355147038), z_dir=(0, -1, 0)) * Cylinder(14.5, 16, mode=Mode.PRIVATE)
    add(fillet1_piece_5)
    with BuildSketch(Plane(origin=(-17.024213777, 0, 23.279463169), x_dir=(-0.9607885973966223, 0, 0.2772819343423431), z_dir=(0.2772819343423431, 0, 0.9607885973966221))) as fillet1_piece_6_section:
        with BuildLine():
            CenterArc((FILLET1_R, -FILLET1_R), FILLET1_R, 90, 90)
            Line((0, -FILLET1_R), (0, 0))
            Line((0, 0), (FILLET1_R, 0))
        make_face()
    fillet1_piece_6 = extrude(amount=5.845025394, mode=Mode.PRIVATE)
    fillet1_piece_6 = fillet1_piece_6 & Plane(origin=(0, 0.275496589, 0), x_dir=(-0.48701542367600353, 0, 0.8733933690506717), z_dir=(0, -1, 0)) * Cylinder(31, 16, mode=Mode.PRIVATE)
    fillet1_piece_6 = fillet1_piece_6 - Plane(origin=(-20.351596989, 0.275496589, 11.75), x_dir=(-0.7305671340428671, 0, -0.6828408765271684), z_dir=(0, -1, 0)) * Cylinder(14.5, 16, mode=Mode.PRIVATE)
    add(fillet1_piece_6)


solid = part.part
